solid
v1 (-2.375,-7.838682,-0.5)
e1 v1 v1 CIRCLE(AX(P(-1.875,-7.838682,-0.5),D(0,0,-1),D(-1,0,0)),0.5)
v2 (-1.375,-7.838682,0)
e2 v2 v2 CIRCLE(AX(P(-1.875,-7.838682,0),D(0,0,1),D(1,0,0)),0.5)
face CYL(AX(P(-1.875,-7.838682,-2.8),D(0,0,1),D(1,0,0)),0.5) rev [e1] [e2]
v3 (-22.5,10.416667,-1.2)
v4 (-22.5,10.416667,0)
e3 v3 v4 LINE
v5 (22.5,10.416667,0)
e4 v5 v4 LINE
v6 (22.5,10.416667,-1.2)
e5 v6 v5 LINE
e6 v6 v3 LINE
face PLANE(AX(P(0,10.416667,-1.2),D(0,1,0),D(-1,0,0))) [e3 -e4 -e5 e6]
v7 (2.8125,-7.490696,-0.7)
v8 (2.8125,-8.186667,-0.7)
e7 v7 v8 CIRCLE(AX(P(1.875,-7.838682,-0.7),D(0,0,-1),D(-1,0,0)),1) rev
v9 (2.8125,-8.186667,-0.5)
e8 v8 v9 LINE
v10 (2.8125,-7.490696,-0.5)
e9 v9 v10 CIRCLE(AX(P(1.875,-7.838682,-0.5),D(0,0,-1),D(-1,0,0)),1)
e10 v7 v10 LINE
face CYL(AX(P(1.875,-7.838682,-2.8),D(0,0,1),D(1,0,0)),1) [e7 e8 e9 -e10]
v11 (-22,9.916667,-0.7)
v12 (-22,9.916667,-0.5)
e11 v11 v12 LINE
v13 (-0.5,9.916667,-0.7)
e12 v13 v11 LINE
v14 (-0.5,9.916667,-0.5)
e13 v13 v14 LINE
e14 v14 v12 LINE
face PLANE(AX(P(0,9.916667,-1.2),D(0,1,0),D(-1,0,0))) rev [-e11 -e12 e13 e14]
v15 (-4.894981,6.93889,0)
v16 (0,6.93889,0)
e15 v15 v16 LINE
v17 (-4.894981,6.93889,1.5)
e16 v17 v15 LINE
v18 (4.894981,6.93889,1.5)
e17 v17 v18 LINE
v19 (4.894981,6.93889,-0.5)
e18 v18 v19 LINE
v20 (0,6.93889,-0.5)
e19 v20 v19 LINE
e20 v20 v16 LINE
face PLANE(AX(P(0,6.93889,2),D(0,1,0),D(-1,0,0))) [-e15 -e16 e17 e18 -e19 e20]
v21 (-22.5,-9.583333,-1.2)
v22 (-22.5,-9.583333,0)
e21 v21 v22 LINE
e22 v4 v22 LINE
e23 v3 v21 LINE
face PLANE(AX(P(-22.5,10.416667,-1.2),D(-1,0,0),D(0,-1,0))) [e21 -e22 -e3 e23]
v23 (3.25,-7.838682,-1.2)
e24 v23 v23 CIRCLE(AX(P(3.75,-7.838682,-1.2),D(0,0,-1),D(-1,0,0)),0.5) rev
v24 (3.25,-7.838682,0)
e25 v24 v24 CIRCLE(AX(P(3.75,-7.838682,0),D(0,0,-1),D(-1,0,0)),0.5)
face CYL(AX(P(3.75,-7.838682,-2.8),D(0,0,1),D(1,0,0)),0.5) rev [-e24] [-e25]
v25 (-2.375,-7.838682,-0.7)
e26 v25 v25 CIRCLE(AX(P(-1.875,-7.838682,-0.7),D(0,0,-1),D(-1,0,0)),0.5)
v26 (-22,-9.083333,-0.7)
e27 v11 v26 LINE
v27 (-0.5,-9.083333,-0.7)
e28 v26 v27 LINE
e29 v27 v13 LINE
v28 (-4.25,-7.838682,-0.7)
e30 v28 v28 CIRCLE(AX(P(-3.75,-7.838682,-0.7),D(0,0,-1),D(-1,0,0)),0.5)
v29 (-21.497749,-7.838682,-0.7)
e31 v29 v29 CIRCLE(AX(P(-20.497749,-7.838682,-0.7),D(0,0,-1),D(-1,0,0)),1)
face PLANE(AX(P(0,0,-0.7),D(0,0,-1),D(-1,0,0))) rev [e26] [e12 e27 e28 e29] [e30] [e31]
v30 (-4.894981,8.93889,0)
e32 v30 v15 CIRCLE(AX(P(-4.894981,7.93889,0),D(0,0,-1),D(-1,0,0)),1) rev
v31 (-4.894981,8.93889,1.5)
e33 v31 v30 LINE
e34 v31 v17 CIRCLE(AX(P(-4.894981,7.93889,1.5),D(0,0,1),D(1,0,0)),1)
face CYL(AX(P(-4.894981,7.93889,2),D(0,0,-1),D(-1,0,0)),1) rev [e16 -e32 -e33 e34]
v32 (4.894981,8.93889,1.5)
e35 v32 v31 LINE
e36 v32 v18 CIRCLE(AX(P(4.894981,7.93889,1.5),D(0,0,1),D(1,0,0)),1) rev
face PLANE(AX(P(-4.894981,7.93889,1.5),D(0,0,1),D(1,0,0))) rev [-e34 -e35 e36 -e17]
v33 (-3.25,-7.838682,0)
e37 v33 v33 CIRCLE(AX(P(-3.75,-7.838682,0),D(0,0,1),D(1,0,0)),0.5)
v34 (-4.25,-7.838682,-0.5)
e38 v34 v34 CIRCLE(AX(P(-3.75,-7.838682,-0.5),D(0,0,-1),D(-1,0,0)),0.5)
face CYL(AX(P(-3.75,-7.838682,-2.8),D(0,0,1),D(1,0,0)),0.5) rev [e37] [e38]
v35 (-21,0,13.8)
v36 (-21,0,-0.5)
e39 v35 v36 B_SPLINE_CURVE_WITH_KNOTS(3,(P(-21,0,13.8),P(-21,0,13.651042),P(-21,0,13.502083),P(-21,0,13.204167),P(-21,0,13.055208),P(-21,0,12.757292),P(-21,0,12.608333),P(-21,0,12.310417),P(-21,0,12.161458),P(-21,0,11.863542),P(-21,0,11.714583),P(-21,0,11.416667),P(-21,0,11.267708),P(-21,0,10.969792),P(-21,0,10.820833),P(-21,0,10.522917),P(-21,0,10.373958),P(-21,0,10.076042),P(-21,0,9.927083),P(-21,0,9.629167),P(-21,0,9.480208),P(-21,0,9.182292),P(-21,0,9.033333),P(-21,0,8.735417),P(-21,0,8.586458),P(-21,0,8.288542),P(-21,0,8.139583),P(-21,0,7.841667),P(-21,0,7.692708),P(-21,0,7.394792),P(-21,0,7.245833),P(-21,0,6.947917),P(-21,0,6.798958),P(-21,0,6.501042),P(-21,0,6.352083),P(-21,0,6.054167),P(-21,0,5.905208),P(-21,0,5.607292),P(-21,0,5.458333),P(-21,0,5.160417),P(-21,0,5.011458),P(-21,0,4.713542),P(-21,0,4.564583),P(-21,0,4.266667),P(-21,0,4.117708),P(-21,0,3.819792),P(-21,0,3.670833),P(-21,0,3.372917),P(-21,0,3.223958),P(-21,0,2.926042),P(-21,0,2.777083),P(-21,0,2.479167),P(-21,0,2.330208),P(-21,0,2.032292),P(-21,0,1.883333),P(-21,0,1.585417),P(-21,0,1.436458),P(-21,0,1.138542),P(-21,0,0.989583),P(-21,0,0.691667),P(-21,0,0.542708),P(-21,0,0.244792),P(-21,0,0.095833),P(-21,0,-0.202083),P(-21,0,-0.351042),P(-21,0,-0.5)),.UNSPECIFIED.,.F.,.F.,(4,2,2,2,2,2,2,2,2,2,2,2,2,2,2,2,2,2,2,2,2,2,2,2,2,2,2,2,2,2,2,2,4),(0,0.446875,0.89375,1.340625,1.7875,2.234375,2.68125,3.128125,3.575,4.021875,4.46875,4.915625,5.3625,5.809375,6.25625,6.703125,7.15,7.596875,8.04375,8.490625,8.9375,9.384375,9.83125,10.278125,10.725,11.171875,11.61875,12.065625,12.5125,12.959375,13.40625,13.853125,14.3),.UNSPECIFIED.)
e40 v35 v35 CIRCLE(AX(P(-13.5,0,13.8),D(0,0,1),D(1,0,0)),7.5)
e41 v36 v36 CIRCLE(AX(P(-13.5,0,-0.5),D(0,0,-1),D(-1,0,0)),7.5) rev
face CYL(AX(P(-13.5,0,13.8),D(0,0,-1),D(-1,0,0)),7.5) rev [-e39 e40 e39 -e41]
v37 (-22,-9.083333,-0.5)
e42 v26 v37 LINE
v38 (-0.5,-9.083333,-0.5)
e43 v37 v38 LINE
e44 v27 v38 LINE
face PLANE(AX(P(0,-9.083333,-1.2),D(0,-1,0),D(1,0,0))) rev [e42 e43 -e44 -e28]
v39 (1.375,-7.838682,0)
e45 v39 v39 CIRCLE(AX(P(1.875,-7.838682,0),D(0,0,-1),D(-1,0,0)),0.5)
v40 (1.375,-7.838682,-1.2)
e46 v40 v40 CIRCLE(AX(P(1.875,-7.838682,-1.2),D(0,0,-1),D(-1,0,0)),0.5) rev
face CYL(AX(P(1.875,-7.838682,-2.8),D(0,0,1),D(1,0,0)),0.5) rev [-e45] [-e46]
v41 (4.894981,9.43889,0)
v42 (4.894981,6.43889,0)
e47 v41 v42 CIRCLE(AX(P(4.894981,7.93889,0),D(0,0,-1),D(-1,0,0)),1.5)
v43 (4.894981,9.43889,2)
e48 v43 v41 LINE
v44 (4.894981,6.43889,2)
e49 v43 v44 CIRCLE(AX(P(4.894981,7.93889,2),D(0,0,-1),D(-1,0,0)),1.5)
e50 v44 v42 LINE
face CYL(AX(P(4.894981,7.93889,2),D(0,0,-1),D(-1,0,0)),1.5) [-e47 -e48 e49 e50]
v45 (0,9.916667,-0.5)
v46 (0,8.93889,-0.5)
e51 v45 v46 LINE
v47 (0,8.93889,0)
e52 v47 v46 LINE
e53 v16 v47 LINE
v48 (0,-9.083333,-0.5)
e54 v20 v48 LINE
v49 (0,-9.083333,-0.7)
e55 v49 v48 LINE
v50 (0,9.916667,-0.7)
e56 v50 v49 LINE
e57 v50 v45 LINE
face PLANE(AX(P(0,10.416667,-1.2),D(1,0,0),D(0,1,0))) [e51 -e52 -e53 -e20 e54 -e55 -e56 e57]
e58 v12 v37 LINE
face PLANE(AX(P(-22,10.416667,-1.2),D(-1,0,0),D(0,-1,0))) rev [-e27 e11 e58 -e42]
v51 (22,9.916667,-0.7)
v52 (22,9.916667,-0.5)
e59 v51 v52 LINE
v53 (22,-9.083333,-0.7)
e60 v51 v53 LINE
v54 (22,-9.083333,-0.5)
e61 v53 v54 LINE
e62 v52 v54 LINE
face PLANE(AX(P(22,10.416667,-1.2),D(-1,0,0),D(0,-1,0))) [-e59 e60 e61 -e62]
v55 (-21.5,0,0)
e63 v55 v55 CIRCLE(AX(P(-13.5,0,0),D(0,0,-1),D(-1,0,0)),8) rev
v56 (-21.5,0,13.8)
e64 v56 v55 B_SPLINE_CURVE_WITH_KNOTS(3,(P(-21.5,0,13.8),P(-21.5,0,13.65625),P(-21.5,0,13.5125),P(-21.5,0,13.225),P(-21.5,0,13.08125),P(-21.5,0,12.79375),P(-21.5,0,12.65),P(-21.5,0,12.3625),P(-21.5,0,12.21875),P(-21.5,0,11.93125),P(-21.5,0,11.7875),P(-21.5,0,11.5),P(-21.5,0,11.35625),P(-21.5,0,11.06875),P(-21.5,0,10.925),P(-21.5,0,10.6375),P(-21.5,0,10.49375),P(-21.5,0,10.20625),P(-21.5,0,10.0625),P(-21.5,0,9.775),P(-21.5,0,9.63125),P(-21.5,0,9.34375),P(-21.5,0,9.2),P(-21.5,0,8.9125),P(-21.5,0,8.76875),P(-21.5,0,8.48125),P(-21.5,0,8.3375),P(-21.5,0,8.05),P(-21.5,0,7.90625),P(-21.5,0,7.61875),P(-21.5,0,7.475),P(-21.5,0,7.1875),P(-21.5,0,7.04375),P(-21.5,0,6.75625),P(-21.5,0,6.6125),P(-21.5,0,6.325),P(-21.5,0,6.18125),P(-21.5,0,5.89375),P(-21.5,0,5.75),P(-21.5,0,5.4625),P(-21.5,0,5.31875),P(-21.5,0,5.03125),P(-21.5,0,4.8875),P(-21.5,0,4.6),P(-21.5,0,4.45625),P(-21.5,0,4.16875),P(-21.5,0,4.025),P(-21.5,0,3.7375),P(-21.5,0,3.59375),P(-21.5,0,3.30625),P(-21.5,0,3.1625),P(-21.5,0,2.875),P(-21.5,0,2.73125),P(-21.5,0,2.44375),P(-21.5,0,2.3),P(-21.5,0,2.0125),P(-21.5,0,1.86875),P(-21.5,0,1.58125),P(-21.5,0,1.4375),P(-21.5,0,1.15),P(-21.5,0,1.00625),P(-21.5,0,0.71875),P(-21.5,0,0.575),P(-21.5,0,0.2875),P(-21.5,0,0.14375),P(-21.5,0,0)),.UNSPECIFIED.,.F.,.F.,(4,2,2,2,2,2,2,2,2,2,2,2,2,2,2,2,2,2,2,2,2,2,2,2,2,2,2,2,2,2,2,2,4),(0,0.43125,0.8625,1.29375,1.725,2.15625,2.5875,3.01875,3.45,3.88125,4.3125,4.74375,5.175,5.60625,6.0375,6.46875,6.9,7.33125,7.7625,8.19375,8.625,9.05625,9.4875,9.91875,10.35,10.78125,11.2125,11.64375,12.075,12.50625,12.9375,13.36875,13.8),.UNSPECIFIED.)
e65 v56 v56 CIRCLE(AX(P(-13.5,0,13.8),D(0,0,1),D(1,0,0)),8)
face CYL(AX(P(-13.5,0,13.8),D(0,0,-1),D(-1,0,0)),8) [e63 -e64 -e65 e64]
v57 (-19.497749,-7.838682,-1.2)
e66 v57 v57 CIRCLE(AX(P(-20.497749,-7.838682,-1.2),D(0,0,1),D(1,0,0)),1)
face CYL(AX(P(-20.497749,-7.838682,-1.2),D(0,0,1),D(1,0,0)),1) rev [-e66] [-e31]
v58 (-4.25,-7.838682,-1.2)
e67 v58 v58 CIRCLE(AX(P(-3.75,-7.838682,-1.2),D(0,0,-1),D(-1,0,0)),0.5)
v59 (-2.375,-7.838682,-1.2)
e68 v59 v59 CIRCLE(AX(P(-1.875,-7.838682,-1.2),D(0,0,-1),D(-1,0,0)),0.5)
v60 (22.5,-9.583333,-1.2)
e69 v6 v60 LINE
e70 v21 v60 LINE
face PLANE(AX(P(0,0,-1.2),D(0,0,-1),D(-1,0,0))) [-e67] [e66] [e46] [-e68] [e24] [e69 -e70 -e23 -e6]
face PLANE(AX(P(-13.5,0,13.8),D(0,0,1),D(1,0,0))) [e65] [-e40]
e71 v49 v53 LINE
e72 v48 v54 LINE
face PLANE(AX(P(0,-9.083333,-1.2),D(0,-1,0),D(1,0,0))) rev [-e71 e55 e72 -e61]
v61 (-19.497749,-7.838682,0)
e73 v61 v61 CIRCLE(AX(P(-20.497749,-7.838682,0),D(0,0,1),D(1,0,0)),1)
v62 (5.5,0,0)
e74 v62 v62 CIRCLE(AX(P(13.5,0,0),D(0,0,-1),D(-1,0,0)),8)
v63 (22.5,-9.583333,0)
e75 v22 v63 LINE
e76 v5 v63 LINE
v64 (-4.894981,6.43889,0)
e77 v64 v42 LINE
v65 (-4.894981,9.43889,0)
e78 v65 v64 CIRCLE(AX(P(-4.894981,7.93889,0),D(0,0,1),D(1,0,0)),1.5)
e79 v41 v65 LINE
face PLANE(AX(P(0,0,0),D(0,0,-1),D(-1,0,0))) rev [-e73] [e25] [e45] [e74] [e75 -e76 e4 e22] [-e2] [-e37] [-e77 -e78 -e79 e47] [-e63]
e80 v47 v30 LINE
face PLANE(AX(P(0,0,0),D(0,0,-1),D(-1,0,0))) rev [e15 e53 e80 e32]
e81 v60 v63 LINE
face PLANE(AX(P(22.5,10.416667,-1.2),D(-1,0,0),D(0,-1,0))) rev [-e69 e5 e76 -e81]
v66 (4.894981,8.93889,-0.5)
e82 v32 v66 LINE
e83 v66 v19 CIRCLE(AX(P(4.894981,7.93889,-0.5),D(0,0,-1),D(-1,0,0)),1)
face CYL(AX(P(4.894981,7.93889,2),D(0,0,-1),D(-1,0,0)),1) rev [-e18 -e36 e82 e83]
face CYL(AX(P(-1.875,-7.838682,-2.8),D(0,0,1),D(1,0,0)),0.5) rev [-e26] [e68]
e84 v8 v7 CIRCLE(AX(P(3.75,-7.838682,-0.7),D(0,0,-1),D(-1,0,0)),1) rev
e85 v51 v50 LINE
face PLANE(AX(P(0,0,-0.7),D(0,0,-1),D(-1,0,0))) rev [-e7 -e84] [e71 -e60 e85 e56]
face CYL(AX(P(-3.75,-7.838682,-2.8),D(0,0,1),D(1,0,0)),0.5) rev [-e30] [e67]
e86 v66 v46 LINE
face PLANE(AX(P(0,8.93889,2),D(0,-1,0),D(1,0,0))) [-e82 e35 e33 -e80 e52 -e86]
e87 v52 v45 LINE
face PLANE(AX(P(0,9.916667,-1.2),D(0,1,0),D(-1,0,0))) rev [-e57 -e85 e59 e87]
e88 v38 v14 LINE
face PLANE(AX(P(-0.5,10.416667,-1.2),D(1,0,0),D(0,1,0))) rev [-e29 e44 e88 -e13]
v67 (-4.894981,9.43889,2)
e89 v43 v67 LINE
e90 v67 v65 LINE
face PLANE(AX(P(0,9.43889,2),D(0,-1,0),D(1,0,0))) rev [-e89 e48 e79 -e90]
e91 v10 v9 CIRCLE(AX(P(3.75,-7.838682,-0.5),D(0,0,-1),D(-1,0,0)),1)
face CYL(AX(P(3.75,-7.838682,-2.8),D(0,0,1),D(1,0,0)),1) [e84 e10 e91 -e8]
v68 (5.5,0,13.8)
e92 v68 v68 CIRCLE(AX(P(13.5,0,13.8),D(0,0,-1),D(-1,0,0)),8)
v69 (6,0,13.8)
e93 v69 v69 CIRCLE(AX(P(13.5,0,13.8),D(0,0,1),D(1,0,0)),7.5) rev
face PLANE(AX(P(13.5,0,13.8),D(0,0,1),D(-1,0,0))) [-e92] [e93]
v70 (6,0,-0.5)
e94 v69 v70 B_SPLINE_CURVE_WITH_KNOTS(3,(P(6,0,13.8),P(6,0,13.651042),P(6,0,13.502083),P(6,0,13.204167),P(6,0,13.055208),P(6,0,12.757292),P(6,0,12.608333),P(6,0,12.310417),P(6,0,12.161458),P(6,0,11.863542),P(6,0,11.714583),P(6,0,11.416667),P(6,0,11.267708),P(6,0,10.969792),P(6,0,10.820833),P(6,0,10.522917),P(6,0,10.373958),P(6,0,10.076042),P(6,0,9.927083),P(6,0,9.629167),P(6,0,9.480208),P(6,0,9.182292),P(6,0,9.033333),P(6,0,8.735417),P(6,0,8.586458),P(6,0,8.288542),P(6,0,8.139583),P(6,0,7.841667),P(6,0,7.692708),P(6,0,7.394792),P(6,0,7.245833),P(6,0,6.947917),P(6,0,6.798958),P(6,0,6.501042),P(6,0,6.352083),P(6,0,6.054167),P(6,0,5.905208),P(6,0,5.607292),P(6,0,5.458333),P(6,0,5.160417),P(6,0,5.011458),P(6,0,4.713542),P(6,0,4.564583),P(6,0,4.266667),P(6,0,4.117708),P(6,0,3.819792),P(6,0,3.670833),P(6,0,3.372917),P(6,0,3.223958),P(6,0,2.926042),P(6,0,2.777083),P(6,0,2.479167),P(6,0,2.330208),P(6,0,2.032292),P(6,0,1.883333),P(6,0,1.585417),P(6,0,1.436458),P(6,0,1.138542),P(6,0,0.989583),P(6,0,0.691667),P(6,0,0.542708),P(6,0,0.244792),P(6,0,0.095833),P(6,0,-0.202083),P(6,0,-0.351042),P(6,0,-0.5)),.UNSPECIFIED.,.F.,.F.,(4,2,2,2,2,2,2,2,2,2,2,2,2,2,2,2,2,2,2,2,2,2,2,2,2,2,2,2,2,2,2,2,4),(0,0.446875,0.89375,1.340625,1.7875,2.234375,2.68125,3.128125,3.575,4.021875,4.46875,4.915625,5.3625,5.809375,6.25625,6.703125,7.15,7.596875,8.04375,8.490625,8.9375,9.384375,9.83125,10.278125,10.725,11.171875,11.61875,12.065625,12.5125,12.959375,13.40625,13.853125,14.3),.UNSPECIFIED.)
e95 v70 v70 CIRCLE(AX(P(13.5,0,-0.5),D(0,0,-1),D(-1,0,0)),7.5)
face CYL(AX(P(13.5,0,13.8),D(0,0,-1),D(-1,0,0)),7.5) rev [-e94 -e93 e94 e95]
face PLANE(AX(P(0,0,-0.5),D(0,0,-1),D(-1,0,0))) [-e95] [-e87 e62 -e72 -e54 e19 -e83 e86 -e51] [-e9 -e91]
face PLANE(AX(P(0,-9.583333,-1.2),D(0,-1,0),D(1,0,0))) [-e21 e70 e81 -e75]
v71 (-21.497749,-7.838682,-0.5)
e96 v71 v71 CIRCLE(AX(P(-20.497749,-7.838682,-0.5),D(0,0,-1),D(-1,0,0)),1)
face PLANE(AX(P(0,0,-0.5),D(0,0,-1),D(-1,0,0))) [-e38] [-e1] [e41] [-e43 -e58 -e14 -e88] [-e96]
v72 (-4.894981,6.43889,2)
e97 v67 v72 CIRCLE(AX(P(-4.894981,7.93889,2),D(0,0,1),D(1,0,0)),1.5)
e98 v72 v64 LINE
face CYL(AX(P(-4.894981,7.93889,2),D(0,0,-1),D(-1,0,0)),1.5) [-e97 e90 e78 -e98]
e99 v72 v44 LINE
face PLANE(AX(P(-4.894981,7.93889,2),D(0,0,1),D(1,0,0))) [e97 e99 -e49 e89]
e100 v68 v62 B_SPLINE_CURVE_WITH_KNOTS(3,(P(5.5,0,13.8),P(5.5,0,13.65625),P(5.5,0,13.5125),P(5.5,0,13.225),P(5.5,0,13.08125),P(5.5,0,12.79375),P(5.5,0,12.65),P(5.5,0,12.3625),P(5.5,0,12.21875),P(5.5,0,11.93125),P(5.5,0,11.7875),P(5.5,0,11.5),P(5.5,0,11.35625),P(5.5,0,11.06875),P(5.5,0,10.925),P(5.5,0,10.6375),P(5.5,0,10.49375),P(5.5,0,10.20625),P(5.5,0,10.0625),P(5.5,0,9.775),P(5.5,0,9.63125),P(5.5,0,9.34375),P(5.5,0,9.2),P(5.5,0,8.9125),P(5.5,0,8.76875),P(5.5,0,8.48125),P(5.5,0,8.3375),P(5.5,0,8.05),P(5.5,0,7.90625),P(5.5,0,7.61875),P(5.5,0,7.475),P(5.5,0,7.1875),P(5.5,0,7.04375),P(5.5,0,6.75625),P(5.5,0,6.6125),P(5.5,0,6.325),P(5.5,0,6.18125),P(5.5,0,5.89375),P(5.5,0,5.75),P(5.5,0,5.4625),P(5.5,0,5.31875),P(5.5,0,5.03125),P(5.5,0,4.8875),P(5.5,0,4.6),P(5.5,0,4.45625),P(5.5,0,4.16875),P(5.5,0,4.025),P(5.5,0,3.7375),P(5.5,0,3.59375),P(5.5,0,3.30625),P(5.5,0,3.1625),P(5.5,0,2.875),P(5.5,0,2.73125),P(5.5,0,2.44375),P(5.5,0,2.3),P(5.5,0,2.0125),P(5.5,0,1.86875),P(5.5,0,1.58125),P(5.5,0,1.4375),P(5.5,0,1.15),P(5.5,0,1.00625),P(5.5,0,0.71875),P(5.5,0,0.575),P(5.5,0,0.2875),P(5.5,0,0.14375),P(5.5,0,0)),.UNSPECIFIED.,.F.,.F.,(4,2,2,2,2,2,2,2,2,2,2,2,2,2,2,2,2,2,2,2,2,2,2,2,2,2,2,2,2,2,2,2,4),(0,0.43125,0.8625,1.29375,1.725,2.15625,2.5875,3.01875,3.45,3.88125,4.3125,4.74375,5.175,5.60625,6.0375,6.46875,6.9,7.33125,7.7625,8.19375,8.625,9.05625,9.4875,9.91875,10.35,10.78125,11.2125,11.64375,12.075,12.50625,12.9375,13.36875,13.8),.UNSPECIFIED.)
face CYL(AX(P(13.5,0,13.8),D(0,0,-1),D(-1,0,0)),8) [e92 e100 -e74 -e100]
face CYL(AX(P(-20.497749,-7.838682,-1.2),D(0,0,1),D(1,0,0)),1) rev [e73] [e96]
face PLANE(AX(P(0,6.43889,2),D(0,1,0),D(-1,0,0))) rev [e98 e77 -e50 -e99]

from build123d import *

# Parameters (mm, degrees)
ESQUISSE1_W             = 22.5
ESQUISSE1_H             = 20
BOSS_EXTRU_1_DEPTH      = 1.2
ESQUISSE2_R             = 8
BOSS_EXTRU_2_DEPTH      = 13.8
COQUE2_T                = -0.5
ESQUISSE3_R             = 1
ENL_V_MAT_EXTRU_1_DEPTH = 29.375992396
ESQUISSE4_R             = 0.5
ENL_V_MAT_EXTRU_2_DEPTH = 2.8
BOSS_EXTRU_3_DEPTH      = 2
SYM_TRIE1_START         = -1.2
SYM_TRIE1_OUTLINE_R     = 8
SYM_TRIE1_DEPTH         = 15
SYM_TRIE1_2_OUTLINE_W   = 22.5
SYM_TRIE1_2_OUTLINE_H   = 20
SYM_TRIE1_2_OUTLINE_R   = 0.5
SYM_TRIE1_2_OUTLINE_R_2 = 8
SYM_TRIE1_2_DEPTH       = 1.2
SYM_TRIE1_3_DEPTH       = 2
COQUE4_T                = -0.5


# Read off the part's stored shape, not the designer's step: Symétrie1
with BuildPart() as part:
    # Esquisse1 → Boss.-Extru.1 (new body)
    with BuildSketch(Plane.XY):
        with Locations((-11.25, 0.416666667)):
            Rectangle(ESQUISSE1_W, ESQUISSE1_H)
    extrude(amount=-BOSS_EXTRU_1_DEPTH)

    # Esquisse2 → Boss.-Extru.2 (add)
    with BuildSketch(Plane.XY):
        with Locations(Location((-13.5, 0, 0), (0, 0, 180))):
            Circle(ESQUISSE2_R)
    extrude(amount=BOSS_EXTRU_2_DEPTH)

    # Coque2
    coque2_openings = [part.faces().sort_by_distance(p)[0] for p in [
        (-13.5, 0, 13.8),
    ]]
    offset(amount=COQUE2_T, openings=coque2_openings, kind=Kind.INTERSECTION)

    # Esquisse3 → Enlèv. mat.-Extru.1 (cut, through all)
    with BuildSketch(Plane.XY):
        with Locations((-20.497748718, -7.838681671)):
            Circle(ESQUISSE3_R)
    extrude(amount=-ENL_V_MAT_EXTRU_1_DEPTH, mode=Mode.SUBTRACT)

    # Esquisse4 → Enlèv. mat.-Extru.2 (cut)
    with BuildSketch(Plane.XY):
        with Locations(Location((-3.75, -7.838681671, 0), (0, 0, 180))):
            Circle(ESQUISSE4_R)
        with Locations(Location((-1.875, -7.838681671, 0), (0, 0, 180))):
            Circle(ESQUISSE4_R)
    extrude(amount=-ENL_V_MAT_EXTRU_2_DEPTH, mode=Mode.SUBTRACT)

    # Esquisse5 → Boss.-Extru.3 (add)
    with BuildSketch(Plane.XY):
        with BuildLine():
            Line((0, 6.438889699), (-4.894980877, 6.438889699))
            ThreePointArc((-4.894980877, 6.438889699), (-6.394980877, 7.938889699), (-4.894980877, 9.438889699))
            Line((-4.894980877, 9.438889699), (0, 9.438889699))
            Line((0, 9.438889699), (0, 6.438889699))
        make_face()
    extrude(amount=BOSS_EXTRU_3_DEPTH)



with BuildPart() as body_2:
    # Symétrie1 outline → Symétrie1 (new body)
    with BuildSketch(Plane.XY.offset(SYM_TRIE1_START)):
        with Locations((13.5, 0)):
            Circle(SYM_TRIE1_OUTLINE_R)
    extrude(amount=SYM_TRIE1_DEPTH)


with BuildPart() as part_1:
    add(part.part)

    add(body_2.part)  # Sym_trie1 2 merges body 2
    # Sym_trie1 2 outline → Sym_trie1 2 (add)
    with BuildSketch(Plane.XY.offset(SYM_TRIE1_START)):
        with Locations((11.25, 0.416666667)):
            Rectangle(SYM_TRIE1_2_OUTLINE_W, SYM_TRIE1_2_OUTLINE_H)
        with Locations((1.875, -7.838681671)):
            Circle(SYM_TRIE1_2_OUTLINE_R, mode=Mode.SUBTRACT)
        with Locations((3.75, -7.838681671)):
            Circle(SYM_TRIE1_2_OUTLINE_R, mode=Mode.SUBTRACT)
        with Locations((13.5, 0)):
            Circle(SYM_TRIE1_2_OUTLINE_R_2, mode=Mode.SUBTRACT)
    extrude(amount=SYM_TRIE1_2_DEPTH)

    # Sym_trie1 3 outline → Sym_trie1 3 (add)
    with BuildSketch(Plane.XY):
        with BuildLine():
            Line((0, 9.438889699), (0, 6.438889699))
            Line((0, 6.438889699), (4.894980877, 6.438889699))
            ThreePointArc((4.894980877, 6.438889699), (6.394980877, 7.938889699), (4.894980877, 9.438889699))
            Line((4.894980877, 9.438889699), (0, 9.438889699))
        make_face()
    extrude(amount=SYM_TRIE1_3_DEPTH)

    # Coque4
    coque4_openings = [part_1.faces().sort_by_distance(p)[0] for p in [
        (13.5, 0, 13.8),
    ]]
    offset(amount=COQUE4_T, openings=coque4_openings, kind=Kind.INTERSECTION)


solid = part_1.part
